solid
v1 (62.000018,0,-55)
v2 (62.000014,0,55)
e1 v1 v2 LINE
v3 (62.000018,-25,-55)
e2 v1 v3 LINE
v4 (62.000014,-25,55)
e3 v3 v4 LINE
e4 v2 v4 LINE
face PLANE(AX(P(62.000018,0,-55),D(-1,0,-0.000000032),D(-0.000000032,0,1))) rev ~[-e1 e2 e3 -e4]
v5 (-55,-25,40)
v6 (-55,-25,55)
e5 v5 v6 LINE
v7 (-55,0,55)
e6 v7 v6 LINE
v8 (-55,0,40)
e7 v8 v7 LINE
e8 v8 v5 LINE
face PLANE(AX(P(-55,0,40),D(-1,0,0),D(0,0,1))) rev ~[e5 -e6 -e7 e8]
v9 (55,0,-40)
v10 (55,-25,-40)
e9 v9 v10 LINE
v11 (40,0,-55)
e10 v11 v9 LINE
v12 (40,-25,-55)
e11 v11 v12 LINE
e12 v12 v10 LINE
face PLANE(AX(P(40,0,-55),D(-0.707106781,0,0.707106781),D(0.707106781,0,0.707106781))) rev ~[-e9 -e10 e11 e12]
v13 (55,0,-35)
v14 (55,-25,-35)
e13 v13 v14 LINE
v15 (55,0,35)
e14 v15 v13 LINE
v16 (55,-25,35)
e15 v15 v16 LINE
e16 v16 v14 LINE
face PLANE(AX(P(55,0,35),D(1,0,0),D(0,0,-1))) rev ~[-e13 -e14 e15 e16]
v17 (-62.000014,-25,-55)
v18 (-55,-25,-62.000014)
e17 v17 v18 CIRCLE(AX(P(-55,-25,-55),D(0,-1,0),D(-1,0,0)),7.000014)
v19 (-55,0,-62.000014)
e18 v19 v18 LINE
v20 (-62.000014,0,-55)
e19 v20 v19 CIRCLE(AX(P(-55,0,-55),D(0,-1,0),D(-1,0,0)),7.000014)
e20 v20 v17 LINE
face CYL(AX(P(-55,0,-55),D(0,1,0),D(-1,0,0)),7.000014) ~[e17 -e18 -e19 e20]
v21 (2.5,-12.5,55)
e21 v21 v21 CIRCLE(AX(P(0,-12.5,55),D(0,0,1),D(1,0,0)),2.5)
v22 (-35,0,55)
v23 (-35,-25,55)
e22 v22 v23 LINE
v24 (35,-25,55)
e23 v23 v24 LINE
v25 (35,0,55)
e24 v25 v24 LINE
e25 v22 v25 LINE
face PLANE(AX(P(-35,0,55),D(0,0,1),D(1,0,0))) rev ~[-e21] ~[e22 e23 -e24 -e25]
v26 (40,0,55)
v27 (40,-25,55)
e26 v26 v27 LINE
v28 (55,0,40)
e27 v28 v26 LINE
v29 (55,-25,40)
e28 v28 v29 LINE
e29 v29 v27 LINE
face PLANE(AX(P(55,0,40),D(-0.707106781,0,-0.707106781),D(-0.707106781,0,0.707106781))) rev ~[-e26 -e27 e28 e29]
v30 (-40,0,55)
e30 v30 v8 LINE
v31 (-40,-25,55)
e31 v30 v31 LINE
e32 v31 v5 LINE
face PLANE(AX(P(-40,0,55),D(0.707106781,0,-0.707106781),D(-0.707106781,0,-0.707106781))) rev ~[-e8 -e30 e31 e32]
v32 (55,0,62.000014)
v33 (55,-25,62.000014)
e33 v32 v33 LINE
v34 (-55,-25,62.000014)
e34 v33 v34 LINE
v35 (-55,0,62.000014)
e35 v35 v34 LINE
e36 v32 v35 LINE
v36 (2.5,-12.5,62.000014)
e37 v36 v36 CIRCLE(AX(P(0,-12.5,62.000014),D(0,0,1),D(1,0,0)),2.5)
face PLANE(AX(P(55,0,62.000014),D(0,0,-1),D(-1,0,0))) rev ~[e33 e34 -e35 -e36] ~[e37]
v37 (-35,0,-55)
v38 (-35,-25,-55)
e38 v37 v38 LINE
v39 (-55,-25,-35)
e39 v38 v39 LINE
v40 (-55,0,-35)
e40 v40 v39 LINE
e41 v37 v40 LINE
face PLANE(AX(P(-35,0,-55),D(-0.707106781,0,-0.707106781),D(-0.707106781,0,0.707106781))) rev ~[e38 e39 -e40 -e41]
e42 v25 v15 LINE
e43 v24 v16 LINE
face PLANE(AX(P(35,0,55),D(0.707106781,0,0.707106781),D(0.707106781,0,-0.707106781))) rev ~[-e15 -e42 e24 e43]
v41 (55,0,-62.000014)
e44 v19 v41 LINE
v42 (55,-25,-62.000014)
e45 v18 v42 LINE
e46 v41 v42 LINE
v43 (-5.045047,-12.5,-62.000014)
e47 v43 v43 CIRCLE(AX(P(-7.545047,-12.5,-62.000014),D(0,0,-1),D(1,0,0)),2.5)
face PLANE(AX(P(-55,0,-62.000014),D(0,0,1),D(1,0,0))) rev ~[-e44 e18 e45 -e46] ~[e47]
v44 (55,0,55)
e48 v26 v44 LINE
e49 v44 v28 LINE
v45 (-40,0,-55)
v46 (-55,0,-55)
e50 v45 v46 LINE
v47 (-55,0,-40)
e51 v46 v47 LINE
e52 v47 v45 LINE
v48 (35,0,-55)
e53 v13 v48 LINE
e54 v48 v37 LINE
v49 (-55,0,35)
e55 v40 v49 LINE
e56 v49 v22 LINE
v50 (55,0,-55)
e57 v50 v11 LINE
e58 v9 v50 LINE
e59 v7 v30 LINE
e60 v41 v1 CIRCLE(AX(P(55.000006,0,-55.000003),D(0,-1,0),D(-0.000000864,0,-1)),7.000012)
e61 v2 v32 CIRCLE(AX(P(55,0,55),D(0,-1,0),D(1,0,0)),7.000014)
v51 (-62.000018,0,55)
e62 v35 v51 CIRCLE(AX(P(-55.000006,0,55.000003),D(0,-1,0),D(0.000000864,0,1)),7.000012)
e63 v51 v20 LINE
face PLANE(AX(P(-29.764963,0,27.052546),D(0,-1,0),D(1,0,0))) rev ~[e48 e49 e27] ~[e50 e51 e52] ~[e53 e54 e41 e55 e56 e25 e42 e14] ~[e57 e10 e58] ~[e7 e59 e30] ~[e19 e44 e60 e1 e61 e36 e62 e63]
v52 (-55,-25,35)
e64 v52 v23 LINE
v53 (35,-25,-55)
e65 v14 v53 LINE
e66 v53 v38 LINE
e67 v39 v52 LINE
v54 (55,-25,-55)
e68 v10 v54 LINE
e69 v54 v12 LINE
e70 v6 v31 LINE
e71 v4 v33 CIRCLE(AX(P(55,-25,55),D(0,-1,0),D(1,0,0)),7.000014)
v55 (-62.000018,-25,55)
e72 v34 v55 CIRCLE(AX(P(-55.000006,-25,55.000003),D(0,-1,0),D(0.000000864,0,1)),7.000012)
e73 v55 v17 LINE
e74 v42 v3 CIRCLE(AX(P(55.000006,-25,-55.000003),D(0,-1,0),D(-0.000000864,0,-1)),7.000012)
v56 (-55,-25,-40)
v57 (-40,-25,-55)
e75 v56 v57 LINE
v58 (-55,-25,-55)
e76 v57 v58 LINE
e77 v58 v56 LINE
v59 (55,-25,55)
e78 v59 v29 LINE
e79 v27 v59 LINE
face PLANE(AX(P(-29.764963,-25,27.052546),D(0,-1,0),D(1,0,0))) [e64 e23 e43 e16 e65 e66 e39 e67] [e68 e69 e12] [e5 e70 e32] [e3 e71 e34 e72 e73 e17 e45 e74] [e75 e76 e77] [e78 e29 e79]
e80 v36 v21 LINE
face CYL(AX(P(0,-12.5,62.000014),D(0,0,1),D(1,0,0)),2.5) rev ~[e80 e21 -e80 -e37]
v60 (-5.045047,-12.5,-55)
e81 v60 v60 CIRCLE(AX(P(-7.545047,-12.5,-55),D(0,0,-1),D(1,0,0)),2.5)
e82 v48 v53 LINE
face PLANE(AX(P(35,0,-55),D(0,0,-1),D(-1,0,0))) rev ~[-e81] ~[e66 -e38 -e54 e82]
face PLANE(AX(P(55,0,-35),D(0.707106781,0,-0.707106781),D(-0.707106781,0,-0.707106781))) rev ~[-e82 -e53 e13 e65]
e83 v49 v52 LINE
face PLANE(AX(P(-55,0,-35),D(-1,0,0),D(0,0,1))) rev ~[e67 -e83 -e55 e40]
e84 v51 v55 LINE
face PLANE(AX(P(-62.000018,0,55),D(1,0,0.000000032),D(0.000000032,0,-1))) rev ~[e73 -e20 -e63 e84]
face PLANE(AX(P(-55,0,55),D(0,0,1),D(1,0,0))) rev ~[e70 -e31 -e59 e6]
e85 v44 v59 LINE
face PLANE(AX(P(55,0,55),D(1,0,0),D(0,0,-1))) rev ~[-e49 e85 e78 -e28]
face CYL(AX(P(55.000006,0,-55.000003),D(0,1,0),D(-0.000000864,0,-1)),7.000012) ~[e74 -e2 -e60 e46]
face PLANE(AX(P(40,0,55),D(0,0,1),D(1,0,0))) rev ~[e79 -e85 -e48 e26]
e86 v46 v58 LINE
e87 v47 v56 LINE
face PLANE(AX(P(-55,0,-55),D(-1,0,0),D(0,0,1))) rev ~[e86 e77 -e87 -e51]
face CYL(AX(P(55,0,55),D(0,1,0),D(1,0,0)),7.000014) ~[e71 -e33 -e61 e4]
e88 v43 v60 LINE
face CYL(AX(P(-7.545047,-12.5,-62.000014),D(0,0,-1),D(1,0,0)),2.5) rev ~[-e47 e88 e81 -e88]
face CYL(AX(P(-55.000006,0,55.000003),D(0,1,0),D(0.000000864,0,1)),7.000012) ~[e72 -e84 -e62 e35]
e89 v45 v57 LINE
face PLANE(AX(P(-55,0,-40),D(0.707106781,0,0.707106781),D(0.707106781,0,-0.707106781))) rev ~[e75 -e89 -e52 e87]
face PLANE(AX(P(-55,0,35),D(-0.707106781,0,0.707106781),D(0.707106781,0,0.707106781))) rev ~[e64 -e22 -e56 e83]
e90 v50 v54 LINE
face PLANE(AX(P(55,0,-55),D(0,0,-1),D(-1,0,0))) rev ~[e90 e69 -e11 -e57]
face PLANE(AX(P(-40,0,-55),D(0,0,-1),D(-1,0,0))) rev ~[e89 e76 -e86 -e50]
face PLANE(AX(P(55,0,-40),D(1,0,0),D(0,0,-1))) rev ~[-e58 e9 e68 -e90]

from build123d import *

# Parameters (mm, degrees)
F1_DEPTH = 25
F3_R     = 2.5
F4_DEPTH = 25
F2_R     = 2.5
F5_DEPTH = 25


# Not quite as in the source:
# - ends of sketch curves that miss each other by under 0.0002 mm in the source are joined


with BuildPart() as f1:
    # F0 (on Front) → F1 (new body)
    with BuildSketch(Plane.XZ):
        with BuildLine():
            Line((40, 55), (55, 55))
            Line((55, 55), (55, 62.0000141774))
            Line((55, 62.0000141774), (-55, 62.0000141774))
            ThreePointArc((-55, 62.0000141774), (-59.9497599972, 59.9497599972), (-62.0000177185, 55))
            Line((-62.0000177185, 55), (-62.0000141774, -55))
            ThreePointArc((-62.0000141774, -55), (-59.9497574932, -59.9497574932), (-55, -62.0000141774))
            Line((-55, -62.0000141774), (-55, -55))
            Line((-55, -55), (-55, -40))
            Line((-55, -40), (-55, -35))
            Line((-55, -35), (-55, 35))
            Line((-55, 35), (-55, 40))
            Line((-55, 40), (-55, 55))
            Line((-55, 55), (-40, 55))
            Line((-40, 55), (-35, 55))
            Line((-35, 55), (35, 55))
            Line((35, 55), (40, 55))
        make_face()
        with BuildLine():
            Line((55, 62.0000141774), (55, 55))
            Line((55, 55), (55, 40))
            Line((55, 40), (55, 35))
            Line((55, 35), (55, -35))
            Line((55, -35), (55, -40))
            Line((55, -40), (55, -55))
            Line((55, -55), (40, -55))
            Line((40, -55), (35, -55))
            Line((35, -55), (-35, -55))
            Line((-35, -55), (-40, -55))
            Line((-40, -55), (-55, -55))
            Line((-55, -55), (-55, -62.0000141774))
            Line((-55, -62.0000141774), (55, -62.0000141774))
            ThreePointArc((55, -62.0000141774), (59.9497599972, -59.9497599972), (62.0000177185, -55))
            Line((62.0000177185, -55), (62.0000141774, 55))
            ThreePointArc((62.0000141774, 55), (59.9497574932, 59.9497574932), (55, 62.0000141774))
        make_face()
        Polygon((-55, 35), (-35, 55), (-40, 55), (-55, 40), align=None)
        Polygon((55, 40), (40, 55), (35, 55), (55, 35), align=None)
        Polygon((55, -40), (55, -35), (35, -55), (40, -55), align=None)
        Polygon((-35, -55), (-55, -35), (-55, -40), (-40, -55), align=None)
    extrude(amount=F1_DEPTH)

    # F3 (on face) → F4 (cut)
    with BuildSketch(Plane(origin=(0, 0, -62.0000141774), x_dir=(1, 0, 0), z_dir=(0, 0, -1))):
        with Locations((-7.5450468063, 12.5)):
            Circle(F3_R)
    extrude(amount=-F4_DEPTH, mode=Mode.SUBTRACT)

    # F2 (on face) → F5 (cut)
    with BuildSketch(Plane.XY.offset(62.0000141774)):
        with Locations((0, -12.5)):
            Circle(F2_R)
    extrude(amount=-F5_DEPTH, mode=Mode.SUBTRACT)


solid = f1.part
